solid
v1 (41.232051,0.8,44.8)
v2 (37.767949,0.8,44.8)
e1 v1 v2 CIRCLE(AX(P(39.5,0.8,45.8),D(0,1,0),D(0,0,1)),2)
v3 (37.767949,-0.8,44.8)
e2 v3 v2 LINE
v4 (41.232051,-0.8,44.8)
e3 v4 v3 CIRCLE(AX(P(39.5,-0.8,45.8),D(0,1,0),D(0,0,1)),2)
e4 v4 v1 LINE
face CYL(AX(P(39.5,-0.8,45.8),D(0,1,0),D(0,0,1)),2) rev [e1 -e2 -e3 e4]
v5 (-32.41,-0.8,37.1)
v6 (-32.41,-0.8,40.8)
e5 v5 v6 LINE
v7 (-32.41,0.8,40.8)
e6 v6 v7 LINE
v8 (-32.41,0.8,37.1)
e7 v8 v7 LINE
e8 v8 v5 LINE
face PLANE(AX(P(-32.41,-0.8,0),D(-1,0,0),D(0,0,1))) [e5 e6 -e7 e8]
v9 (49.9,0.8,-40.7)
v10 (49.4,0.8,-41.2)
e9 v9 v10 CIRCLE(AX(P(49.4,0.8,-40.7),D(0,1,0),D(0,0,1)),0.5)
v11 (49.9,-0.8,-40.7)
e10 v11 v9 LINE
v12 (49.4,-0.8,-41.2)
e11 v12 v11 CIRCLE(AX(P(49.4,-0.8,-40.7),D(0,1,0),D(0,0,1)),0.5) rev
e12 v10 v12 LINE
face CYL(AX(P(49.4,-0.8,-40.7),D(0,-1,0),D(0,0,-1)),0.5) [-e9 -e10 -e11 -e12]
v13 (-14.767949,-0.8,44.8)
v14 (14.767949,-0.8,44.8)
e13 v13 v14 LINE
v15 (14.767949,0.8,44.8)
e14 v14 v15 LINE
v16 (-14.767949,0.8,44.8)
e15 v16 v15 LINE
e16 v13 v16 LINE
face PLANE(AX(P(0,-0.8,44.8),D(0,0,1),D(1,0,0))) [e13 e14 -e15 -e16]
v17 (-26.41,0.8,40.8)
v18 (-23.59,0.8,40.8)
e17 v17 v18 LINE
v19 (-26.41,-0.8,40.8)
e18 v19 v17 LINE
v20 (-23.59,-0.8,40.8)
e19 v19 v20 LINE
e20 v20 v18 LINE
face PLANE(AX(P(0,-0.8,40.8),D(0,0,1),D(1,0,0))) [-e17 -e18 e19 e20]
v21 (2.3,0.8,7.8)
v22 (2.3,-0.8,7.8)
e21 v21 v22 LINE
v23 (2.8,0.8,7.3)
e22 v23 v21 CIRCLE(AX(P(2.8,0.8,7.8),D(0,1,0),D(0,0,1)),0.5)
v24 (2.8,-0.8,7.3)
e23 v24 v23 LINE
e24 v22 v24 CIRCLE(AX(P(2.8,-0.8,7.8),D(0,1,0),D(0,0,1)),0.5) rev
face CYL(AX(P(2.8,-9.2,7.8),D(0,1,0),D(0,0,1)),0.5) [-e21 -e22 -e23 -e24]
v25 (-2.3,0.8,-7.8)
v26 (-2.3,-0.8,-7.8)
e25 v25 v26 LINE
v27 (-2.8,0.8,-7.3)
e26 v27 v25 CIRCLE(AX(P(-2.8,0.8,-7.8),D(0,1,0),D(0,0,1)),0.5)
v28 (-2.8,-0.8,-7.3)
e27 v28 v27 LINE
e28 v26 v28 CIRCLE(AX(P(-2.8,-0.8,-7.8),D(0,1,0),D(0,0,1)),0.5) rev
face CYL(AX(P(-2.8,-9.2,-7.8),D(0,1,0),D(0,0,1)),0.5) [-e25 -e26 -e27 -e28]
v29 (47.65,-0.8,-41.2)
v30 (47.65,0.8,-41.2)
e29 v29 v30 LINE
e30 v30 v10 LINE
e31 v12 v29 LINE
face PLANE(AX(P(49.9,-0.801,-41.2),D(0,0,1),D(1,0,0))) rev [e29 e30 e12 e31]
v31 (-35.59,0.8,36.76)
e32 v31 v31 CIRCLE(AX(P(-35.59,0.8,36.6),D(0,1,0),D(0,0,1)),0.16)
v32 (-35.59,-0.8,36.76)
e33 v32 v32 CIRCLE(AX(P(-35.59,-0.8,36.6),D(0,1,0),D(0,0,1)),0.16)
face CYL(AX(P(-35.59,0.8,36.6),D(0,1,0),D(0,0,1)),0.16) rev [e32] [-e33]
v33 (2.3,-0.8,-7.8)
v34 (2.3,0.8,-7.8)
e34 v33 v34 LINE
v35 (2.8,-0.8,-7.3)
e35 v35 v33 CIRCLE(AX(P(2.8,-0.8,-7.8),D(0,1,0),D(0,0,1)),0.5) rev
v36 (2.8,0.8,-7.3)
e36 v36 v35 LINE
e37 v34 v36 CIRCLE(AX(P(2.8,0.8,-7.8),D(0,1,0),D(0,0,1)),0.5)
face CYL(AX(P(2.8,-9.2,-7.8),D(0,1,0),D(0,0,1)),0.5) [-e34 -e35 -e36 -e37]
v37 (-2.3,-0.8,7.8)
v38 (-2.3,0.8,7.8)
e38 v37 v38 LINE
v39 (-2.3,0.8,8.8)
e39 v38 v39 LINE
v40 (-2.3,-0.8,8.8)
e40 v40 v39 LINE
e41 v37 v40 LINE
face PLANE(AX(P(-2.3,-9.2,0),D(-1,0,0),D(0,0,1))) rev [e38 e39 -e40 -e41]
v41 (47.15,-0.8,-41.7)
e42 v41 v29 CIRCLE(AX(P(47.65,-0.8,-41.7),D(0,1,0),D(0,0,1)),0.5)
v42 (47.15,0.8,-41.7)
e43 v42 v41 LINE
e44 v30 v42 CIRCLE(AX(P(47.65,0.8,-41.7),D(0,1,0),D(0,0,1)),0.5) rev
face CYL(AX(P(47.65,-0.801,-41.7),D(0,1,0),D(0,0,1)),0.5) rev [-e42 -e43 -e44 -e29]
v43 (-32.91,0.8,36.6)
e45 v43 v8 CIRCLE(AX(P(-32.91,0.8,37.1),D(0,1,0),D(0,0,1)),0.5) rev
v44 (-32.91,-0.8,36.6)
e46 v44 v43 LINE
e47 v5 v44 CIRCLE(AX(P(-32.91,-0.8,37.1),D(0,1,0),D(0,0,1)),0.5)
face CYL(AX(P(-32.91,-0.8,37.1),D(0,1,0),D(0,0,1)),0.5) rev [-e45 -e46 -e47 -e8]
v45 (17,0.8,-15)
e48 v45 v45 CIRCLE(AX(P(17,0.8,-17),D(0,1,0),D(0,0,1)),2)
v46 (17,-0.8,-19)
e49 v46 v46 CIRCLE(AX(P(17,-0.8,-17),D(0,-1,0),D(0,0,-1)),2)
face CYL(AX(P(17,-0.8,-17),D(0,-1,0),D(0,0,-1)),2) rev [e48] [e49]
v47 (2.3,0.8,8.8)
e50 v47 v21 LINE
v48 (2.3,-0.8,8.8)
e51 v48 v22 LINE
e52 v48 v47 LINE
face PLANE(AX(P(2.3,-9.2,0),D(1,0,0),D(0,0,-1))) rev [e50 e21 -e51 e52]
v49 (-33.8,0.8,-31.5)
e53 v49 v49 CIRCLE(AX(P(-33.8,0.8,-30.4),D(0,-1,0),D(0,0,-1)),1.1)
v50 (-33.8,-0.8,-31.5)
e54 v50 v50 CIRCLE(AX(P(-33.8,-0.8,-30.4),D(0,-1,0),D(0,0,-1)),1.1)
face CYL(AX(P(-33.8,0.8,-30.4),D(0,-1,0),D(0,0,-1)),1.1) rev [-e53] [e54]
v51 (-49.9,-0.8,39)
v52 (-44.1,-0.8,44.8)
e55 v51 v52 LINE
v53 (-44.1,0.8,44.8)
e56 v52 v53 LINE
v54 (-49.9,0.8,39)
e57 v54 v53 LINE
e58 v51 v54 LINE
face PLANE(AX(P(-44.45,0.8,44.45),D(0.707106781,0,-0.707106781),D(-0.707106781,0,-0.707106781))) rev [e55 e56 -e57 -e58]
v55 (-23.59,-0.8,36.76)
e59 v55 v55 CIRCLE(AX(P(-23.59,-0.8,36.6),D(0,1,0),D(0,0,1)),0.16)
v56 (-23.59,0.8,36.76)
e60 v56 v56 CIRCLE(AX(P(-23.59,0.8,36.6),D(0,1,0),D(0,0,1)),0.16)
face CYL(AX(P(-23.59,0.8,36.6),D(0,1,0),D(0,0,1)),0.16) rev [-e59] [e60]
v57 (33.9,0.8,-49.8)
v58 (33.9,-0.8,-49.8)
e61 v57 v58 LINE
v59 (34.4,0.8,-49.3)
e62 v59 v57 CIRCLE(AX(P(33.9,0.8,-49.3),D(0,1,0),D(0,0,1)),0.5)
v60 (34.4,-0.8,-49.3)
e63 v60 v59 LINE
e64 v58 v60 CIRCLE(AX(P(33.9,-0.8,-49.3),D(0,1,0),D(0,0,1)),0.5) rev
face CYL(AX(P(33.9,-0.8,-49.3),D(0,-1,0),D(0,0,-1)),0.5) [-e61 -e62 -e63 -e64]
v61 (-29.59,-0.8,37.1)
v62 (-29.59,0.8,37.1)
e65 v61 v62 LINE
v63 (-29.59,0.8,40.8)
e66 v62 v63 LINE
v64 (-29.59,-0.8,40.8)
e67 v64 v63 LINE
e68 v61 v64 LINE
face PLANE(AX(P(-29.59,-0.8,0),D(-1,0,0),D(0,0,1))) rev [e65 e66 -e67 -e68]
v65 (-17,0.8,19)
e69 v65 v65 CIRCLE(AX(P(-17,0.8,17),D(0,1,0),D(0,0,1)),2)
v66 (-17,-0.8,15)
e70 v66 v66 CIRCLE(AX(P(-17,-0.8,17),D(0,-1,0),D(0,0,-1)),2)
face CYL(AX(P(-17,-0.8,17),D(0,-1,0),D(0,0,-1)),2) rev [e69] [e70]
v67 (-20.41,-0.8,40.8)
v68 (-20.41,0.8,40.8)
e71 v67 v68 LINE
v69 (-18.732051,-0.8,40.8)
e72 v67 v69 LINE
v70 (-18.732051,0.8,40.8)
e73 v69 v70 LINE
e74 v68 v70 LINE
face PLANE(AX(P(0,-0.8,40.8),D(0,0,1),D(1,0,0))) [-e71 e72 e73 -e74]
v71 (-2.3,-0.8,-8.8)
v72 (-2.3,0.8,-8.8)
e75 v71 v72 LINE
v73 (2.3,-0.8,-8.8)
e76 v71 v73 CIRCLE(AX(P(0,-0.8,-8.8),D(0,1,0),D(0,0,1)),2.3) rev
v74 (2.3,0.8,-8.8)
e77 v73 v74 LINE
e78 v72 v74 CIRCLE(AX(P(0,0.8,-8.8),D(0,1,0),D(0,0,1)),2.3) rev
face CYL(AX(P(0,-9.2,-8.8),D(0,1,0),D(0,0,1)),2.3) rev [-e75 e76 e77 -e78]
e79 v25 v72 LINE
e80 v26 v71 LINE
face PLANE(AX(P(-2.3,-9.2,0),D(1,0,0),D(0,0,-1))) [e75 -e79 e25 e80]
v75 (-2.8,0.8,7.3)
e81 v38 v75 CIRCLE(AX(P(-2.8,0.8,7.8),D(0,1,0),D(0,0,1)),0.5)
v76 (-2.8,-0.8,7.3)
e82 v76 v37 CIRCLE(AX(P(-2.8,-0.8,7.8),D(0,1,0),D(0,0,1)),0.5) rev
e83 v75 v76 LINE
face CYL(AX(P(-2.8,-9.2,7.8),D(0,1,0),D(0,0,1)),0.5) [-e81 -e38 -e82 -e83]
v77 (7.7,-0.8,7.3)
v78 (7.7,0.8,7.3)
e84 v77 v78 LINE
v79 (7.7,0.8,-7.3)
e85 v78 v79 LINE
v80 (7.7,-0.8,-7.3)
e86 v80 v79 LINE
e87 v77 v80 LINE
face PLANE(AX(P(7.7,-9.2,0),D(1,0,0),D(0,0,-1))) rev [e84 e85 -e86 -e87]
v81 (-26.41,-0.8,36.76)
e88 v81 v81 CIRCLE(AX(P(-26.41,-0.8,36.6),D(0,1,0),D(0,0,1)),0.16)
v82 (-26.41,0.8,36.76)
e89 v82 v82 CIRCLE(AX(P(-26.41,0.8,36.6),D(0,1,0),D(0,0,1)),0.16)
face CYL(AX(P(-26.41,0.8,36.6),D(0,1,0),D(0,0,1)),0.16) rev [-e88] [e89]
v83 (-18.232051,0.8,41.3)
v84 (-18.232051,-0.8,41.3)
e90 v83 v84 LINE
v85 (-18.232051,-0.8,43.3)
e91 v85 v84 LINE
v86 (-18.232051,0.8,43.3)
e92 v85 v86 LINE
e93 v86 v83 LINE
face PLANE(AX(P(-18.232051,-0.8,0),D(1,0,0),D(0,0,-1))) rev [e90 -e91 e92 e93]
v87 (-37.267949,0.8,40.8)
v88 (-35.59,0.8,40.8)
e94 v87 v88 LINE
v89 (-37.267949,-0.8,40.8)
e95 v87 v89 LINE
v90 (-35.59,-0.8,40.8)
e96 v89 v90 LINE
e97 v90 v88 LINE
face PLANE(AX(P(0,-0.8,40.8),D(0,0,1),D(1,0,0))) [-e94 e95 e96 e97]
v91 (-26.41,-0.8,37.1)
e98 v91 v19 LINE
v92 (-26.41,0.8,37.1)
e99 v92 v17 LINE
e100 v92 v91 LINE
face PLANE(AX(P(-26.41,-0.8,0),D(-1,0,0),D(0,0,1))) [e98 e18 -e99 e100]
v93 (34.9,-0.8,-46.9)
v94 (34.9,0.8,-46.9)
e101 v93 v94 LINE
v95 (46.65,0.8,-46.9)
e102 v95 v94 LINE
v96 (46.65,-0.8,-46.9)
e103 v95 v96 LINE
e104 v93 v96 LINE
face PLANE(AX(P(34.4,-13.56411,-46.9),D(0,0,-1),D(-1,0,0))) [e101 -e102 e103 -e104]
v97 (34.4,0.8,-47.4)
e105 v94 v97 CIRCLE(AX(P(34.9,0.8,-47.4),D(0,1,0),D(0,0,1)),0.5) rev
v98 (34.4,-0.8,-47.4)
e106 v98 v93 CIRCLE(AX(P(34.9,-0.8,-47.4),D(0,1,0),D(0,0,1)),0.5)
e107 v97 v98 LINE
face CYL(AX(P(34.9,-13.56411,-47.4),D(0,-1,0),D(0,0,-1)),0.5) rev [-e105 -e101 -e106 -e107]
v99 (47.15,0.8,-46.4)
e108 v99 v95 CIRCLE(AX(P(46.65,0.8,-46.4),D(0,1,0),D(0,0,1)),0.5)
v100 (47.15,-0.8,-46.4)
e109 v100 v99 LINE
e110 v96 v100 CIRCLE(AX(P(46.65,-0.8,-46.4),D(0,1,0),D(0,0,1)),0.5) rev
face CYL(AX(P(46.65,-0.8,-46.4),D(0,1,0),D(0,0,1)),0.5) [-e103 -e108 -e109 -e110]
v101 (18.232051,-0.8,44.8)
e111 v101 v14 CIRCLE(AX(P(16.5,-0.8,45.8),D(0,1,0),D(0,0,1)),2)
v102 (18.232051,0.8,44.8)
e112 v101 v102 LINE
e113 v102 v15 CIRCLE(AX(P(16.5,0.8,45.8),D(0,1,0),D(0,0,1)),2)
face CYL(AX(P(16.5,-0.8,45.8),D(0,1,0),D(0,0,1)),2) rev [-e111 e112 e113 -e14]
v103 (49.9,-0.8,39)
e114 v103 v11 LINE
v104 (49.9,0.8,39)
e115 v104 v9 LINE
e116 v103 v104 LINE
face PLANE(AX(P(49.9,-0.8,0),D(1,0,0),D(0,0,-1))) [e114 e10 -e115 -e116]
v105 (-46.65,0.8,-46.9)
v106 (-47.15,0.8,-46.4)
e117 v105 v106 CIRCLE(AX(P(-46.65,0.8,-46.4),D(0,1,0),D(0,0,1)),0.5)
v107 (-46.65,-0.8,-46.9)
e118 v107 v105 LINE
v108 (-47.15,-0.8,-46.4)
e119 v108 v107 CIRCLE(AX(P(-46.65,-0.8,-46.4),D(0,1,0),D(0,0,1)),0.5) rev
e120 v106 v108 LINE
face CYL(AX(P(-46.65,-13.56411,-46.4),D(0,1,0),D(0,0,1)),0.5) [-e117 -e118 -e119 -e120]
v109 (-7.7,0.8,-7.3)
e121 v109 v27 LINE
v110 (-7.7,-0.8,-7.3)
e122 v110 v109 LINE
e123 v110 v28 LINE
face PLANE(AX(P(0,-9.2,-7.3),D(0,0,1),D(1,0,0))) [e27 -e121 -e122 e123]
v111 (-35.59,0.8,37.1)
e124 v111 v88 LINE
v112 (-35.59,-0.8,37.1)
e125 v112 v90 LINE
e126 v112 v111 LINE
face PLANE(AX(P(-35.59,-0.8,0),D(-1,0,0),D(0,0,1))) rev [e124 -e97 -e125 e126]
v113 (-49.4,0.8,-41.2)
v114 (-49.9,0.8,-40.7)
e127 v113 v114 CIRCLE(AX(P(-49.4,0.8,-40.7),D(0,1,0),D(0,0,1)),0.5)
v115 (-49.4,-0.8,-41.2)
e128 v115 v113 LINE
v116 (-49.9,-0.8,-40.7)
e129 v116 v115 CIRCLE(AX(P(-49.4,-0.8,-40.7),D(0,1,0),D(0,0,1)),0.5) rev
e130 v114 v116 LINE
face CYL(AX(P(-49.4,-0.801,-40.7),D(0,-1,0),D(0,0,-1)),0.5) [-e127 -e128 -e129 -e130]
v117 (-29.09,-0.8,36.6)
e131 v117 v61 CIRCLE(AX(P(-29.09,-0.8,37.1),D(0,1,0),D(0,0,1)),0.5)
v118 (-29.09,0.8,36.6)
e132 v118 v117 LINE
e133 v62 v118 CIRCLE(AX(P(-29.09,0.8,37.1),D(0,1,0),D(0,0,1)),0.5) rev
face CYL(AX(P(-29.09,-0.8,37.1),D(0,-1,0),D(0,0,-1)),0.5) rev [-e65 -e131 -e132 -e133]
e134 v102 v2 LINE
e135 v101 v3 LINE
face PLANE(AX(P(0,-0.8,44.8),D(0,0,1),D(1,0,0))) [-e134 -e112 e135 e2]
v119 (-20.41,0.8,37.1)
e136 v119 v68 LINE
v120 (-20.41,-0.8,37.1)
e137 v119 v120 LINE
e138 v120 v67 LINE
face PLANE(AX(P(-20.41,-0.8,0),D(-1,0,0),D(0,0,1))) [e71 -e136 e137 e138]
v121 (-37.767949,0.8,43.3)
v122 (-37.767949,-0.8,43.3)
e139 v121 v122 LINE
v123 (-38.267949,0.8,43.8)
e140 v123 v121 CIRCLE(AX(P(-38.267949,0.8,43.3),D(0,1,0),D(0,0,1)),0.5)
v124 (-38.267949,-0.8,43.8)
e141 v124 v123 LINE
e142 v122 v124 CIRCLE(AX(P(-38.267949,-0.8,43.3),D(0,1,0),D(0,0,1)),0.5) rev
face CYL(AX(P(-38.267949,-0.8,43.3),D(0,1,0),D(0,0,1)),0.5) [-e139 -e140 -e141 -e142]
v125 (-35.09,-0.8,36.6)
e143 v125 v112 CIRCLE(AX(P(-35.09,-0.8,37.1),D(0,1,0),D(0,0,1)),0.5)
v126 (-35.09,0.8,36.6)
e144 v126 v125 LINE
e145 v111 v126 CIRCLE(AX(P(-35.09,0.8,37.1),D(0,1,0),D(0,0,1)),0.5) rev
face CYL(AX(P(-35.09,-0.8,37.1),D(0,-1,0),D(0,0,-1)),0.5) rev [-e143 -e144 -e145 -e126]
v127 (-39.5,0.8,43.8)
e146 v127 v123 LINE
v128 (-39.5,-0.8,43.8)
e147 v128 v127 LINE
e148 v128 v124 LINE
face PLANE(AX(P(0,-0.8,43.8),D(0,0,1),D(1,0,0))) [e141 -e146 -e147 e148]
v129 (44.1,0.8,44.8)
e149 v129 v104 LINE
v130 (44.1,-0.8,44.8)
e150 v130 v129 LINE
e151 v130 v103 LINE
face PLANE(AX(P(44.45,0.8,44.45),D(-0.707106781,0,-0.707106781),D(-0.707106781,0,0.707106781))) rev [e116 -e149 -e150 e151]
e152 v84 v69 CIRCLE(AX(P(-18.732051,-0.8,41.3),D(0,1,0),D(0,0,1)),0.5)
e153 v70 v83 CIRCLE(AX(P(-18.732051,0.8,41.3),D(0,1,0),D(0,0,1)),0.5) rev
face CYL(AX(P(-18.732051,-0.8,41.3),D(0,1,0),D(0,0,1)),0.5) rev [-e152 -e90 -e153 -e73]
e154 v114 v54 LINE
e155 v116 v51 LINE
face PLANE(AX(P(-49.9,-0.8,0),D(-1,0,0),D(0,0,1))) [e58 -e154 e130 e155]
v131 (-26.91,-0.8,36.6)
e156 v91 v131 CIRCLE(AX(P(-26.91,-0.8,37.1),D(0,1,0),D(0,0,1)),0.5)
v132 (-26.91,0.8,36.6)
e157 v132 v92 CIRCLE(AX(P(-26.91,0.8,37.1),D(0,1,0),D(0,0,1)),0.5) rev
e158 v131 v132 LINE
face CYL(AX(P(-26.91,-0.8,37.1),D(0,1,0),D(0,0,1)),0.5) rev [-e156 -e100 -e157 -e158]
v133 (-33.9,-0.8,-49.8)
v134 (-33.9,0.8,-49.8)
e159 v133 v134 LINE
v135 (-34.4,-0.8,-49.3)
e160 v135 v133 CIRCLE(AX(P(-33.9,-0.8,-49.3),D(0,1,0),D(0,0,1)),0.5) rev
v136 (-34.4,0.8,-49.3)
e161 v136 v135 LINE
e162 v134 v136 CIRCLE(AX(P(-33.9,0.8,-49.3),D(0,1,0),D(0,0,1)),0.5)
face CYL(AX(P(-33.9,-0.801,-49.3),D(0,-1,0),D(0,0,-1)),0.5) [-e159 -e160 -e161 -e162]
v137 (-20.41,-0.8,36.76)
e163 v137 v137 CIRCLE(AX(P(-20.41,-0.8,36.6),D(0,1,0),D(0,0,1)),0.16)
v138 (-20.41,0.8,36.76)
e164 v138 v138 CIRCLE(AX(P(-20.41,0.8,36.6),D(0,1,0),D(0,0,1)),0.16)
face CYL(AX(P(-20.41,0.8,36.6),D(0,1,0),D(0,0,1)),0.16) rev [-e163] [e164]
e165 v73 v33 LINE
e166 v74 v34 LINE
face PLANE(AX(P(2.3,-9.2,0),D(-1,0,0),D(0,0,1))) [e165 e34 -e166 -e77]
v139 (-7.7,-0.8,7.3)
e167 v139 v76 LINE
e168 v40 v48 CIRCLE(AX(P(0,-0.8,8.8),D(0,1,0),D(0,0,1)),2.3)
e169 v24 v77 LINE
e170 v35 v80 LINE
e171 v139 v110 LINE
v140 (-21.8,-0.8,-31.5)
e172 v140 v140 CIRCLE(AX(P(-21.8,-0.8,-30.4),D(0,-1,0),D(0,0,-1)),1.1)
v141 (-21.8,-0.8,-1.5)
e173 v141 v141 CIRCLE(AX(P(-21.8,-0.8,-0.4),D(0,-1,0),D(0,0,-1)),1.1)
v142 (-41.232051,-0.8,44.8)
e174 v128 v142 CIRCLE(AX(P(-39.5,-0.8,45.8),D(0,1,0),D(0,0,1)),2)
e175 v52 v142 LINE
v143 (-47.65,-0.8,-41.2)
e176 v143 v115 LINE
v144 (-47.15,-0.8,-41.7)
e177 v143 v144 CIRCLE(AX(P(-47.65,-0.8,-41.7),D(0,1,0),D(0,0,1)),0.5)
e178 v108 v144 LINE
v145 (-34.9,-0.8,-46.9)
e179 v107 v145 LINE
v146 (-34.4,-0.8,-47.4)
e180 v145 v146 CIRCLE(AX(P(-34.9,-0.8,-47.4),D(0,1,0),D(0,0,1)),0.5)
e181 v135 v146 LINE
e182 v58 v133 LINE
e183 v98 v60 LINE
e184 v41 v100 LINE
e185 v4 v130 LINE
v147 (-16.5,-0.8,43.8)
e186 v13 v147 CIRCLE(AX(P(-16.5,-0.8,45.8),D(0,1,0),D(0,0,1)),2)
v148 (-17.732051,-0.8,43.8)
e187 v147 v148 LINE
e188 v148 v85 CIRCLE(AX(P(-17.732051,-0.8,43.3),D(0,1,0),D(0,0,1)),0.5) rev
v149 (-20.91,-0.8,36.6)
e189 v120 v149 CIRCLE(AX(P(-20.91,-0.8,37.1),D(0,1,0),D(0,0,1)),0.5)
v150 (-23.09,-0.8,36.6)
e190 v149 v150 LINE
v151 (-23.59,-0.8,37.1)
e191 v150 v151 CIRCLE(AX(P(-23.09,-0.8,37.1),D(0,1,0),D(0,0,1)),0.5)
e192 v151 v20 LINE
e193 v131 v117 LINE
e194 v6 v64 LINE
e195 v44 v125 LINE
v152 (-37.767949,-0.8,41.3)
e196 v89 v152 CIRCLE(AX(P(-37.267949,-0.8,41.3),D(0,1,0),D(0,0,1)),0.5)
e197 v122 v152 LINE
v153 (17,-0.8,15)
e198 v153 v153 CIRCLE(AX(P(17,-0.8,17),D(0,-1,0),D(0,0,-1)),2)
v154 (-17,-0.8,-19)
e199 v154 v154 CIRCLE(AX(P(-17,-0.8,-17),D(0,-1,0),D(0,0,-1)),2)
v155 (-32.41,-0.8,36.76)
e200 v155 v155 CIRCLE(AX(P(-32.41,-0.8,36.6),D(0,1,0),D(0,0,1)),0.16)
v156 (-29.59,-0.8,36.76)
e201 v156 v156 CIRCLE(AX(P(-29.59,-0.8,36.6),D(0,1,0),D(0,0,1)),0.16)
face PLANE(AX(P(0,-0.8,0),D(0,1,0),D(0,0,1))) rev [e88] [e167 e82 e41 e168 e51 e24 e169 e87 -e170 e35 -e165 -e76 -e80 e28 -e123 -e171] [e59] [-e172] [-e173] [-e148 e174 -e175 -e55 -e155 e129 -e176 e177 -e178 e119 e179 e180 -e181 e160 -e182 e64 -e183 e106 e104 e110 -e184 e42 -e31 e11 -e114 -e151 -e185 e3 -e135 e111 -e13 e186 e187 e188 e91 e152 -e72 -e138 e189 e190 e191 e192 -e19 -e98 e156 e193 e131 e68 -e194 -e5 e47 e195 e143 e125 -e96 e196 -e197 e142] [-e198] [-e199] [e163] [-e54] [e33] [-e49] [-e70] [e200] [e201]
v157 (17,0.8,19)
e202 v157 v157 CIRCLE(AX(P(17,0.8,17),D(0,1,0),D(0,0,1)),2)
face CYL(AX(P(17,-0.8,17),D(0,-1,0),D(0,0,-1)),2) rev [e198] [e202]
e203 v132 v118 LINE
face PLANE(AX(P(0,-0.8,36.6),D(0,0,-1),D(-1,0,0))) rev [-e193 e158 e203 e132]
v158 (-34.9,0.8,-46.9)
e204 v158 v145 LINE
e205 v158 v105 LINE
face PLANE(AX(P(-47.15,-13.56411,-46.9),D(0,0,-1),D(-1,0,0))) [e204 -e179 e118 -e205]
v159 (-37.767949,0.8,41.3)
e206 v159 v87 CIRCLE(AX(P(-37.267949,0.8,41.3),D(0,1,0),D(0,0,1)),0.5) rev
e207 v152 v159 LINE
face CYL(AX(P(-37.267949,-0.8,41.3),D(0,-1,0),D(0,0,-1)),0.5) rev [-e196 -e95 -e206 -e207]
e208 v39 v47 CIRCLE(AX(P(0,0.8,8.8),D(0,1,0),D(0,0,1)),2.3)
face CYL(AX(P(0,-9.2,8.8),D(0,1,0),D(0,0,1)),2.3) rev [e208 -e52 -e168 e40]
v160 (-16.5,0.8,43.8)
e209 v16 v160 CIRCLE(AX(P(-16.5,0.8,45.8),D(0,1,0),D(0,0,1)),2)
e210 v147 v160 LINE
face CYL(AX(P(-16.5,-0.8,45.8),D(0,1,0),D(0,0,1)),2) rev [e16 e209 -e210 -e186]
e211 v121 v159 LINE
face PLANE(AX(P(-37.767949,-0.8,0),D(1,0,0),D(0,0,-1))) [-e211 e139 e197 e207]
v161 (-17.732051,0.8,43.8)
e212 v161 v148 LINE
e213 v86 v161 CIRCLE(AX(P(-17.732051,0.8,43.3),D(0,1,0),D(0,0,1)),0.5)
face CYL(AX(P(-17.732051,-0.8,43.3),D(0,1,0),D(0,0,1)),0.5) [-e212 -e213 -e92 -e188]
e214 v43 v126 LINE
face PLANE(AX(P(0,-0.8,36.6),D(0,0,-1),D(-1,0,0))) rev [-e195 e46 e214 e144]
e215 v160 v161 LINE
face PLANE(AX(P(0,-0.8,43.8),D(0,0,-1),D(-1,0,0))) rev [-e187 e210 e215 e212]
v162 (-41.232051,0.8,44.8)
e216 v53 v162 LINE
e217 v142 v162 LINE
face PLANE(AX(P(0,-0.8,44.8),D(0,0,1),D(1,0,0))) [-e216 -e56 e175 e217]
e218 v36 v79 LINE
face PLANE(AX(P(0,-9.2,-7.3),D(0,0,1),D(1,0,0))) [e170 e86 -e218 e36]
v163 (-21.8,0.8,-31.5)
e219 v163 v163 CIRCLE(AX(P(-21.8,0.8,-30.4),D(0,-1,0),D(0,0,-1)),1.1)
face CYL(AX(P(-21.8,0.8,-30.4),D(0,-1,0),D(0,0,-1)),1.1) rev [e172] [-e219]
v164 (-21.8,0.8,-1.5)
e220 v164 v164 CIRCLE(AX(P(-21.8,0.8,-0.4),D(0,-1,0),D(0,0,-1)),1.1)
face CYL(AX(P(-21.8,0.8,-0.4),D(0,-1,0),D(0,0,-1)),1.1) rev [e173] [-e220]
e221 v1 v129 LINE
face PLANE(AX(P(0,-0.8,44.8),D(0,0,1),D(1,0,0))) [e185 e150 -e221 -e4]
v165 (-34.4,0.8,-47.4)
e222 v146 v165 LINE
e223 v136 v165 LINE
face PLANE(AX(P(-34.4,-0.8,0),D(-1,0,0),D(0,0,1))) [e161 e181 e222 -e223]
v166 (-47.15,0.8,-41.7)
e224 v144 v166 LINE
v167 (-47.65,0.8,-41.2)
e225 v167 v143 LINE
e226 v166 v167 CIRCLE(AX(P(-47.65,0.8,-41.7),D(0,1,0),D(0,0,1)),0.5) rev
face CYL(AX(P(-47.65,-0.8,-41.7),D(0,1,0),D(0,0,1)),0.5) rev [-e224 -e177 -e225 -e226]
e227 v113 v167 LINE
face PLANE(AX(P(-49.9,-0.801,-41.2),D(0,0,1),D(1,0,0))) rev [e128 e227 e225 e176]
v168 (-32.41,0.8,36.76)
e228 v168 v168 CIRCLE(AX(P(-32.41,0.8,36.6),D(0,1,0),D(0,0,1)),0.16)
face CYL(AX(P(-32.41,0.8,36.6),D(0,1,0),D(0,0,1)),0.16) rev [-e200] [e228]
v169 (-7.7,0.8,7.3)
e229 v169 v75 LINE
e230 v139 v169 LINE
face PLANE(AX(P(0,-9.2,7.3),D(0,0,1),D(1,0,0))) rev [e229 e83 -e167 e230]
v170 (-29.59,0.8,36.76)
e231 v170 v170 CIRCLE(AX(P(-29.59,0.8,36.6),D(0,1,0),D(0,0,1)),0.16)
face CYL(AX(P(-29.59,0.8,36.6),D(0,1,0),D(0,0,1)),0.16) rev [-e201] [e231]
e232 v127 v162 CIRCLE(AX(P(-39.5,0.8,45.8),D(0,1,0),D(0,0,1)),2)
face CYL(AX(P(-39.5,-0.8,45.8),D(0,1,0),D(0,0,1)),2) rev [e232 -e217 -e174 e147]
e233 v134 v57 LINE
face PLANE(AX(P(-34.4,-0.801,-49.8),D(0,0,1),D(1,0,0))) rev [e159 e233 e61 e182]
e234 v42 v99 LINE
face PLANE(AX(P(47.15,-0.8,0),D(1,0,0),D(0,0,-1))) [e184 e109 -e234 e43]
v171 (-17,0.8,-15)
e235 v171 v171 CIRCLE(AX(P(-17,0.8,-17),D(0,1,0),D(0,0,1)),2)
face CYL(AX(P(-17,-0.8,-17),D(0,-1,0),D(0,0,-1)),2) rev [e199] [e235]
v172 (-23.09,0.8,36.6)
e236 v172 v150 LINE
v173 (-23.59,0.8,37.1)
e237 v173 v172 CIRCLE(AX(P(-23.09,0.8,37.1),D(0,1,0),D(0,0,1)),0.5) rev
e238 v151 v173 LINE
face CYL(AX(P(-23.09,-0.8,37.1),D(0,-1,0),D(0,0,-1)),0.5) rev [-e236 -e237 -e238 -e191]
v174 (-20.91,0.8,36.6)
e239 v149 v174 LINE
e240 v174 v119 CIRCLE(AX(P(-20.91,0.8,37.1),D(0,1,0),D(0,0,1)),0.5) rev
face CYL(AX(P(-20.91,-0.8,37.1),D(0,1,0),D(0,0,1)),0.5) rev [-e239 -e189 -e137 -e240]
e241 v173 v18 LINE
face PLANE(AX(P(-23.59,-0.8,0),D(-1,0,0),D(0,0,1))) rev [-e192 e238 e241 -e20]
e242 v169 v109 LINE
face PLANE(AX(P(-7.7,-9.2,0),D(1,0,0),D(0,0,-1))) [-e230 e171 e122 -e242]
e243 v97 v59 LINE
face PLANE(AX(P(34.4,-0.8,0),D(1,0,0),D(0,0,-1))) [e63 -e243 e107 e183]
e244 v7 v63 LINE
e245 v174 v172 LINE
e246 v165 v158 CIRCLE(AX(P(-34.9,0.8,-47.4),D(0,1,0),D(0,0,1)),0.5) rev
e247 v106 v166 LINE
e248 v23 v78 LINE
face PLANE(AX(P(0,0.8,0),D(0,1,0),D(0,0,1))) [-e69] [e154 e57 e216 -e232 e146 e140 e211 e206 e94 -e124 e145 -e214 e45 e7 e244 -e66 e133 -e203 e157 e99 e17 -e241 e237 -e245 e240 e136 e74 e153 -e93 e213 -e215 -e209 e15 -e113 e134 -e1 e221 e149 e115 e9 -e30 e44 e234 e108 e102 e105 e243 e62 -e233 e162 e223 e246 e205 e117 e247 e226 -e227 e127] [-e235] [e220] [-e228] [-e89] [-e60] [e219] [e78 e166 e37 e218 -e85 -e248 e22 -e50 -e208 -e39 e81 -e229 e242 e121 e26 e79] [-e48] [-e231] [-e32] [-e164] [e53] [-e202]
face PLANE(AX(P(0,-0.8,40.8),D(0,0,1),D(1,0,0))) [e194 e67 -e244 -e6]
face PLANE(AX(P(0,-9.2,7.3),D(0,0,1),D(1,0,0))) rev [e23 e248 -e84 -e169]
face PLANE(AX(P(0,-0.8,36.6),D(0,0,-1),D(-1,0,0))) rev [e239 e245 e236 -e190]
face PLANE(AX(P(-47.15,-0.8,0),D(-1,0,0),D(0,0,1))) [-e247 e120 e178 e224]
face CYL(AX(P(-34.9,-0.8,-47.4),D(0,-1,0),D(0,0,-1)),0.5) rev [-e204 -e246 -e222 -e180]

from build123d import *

# Parameters (mm, degrees)
GENERICCARDPCBDEFINITION_FILLET3_START   = -0.8
GENERICCARDPCBDEFINITION_FILLET3_OUTLI_R = 0.16
GENERICCARDPCBDEFINITION_FILLET3_DEPTH   = 1.6
SKETCH1_R                                = 1
SKETCH1_W                                = 15.4
SKETCH1_H                                = 14.6
SKETCH1_W_2                              = 13.4
SKETCH1_H_2                              = 12.6
CUT_EXTRUDE1_DEPTH                       = 10
F_4_0MM_DOWEL_HOLE1_D                    = 4
F_4_0MM_DOWEL_HOLE1_DEPTH                = 29.81
F_4_0MM_DOWEL_HOLE1_TIP                  = 1.201721238
SKETCH5_R                                = 1.1
CUT_EXTRUDE2_DEPTH                       = 71.516735602
FILLET1_R                                = 0.5


# Read off the part's stored shape, not the designer's step: <GenericCardPCBDefinition>-<Fillet3>
with BuildPart() as part:
    # <GenericCardPCBDefinition>-<Fillet3> outli → <GenericCardPCBDefinition>-<Fillet3> (new body)
    with BuildSketch(Plane(origin=(0, 0, 0), x_dir=(1, 0, 0), z_dir=(0, 1, 0)).offset(GENERICCARDPCBDEFINITION_FILLET3_START)):
        with BuildLine():
            ThreePointArc((-41.232050808, -44.8), (-40.5, -44.067949192), (-39.5, -43.8))
            Line((-39.5, -43.8), (-38.267949192, -43.8))
            ThreePointArc((-38.267949192, -43.8), (-37.914395801, -43.653553391), (-37.767949192, -43.3))
            Line((-37.767949192, -43.3), (-37.767949192, -41.3))
            ThreePointArc((-37.767949192, -41.3), (-37.621502583, -40.946446609), (-37.267949192, -40.8))
            Line((-37.267949192, -40.8), (-35.59, -40.8))
            Line((-35.59, -40.8), (-35.59, -37.1))
            ThreePointArc((-35.59, -37.1), (-35.443553391, -36.746446609), (-35.09, -36.6))
            Line((-35.09, -36.6), (-32.91, -36.6))
            ThreePointArc((-32.91, -36.6), (-32.556446609, -36.746446609), (-32.41, -37.1))
            Line((-32.41, -37.1), (-32.41, -40.8))
            Line((-32.41, -40.8), (-29.59, -40.8))
            Line((-29.59, -40.8), (-29.59, -37.1))
            ThreePointArc((-29.59, -37.1), (-29.443553391, -36.746446609), (-29.09, -36.6))
            Line((-29.09, -36.6), (-26.91, -36.6))
            ThreePointArc((-26.91, -36.6), (-26.556446609, -36.746446609), (-26.41, -37.1))
            Line((-26.41, -37.1), (-26.41, -40.8))
            Line((-26.41, -40.8), (-23.59, -40.8))
            Line((-23.59, -40.8), (-23.59, -37.1))
            ThreePointArc((-23.59, -37.1), (-23.443553391, -36.746446609), (-23.09, -36.6))
            Line((-23.09, -36.6), (-20.91, -36.6))
            ThreePointArc((-20.91, -36.6), (-20.556446609, -36.746446609), (-20.41, -37.1))
            Line((-20.41, -37.1), (-20.41, -40.8))
            Line((-20.41, -40.8), (-18.732050808, -40.8))
            ThreePointArc((-18.732050808, -40.8), (-18.378497417, -40.946446609), (-18.232050808, -41.3))
            Line((-18.232050808, -41.3), (-18.232050808, -43.3))
            ThreePointArc((-18.232050808, -43.3), (-18.085604199, -43.653553391), (-17.732050808, -43.8))
            Line((-17.732050808, -43.8), (-16.5, -43.8))
            ThreePointArc((-16.5, -43.8), (-15.5, -44.067949192), (-14.767949192, -44.8))
            Line((-14.767949192, -44.8), (14.767949192, -44.8))
            ThreePointArc((14.767949192, -44.8), (16.5, -43.8), (18.232050808, -44.8))
            Line((18.232050808, -44.8), (37.767949192, -44.8))
            ThreePointArc((37.767949192, -44.8), (39.5, -43.8), (41.232050808, -44.8))
            Line((41.232050808, -44.8), (44.1, -44.8))
            Line((44.1, -44.8), (49.9, -39))
            Line((49.9, -39), (49.9, 40.7))
            ThreePointArc((49.9, 40.7), (49.753553391, 41.053553391), (49.4, 41.2))
            Line((49.4, 41.2), (47.65, 41.2))
            ThreePointArc((47.65, 41.2), (47.296446609, 41.346446609), (47.15, 41.7))
            Line((47.15, 41.7), (47.15, 46.4))
            ThreePointArc((47.15, 46.4), (47.003553391, 46.753553391), (46.65, 46.9))
            Line((46.65, 46.9), (34.9, 46.9))
            ThreePointArc((34.9, 46.9), (34.546446609, 47.046446609), (34.4, 47.4))
            Line((34.4, 47.4), (34.4, 49.3))
            ThreePointArc((34.4, 49.3), (34.253553391, 49.653553391), (33.9, 49.8))
            Line((33.9, 49.8), (-33.9, 49.8))
            ThreePointArc((-33.9, 49.8), (-34.253553391, 49.653553391), (-34.4, 49.3))
            Line((-34.4, 49.3), (-34.4, 47.4))
            ThreePointArc((-34.4, 47.4), (-34.546446609, 47.046446609), (-34.9, 46.9))
            Line((-34.9, 46.9), (-46.65, 46.9))
            ThreePointArc((-46.65, 46.9), (-47.003553391, 46.753553391), (-47.15, 46.4))
            Line((-47.15, 46.4), (-47.15, 41.7))
            ThreePointArc((-47.15, 41.7), (-47.296446609, 41.346446609), (-47.65, 41.2))
            Line((-47.65, 41.2), (-49.4, 41.2))
            ThreePointArc((-49.4, 41.2), (-49.753553391, 41.053553391), (-49.9, 40.7))
            Line((-49.9, 40.7), (-49.9, -39))
            Line((-49.9, -39), (-44.1, -44.8))
            Line((-44.1, -44.8), (-41.232050808, -44.8))
        make_face()
        with Locations((-35.59, -36.6)):
            Circle(GENERICCARDPCBDEFINITION_FILLET3_OUTLI_R, mode=Mode.SUBTRACT)
        with Locations((-32.41, -36.6)):
            Circle(GENERICCARDPCBDEFINITION_FILLET3_OUTLI_R, mode=Mode.SUBTRACT)
        with Locations((-29.59, -36.6)):
            Circle(GENERICCARDPCBDEFINITION_FILLET3_OUTLI_R, mode=Mode.SUBTRACT)
        with Locations((-26.41, -36.6)):
            Circle(GENERICCARDPCBDEFINITION_FILLET3_OUTLI_R, mode=Mode.SUBTRACT)
        with Locations((-23.59, -36.6)):
            Circle(GENERICCARDPCBDEFINITION_FILLET3_OUTLI_R, mode=Mode.SUBTRACT)
        with Locations((-20.41, -36.6)):
            Circle(GENERICCARDPCBDEFINITION_FILLET3_OUTLI_R, mode=Mode.SUBTRACT)
    extrude(amount=GENERICCARDPCBDEFINITION_FILLET3_DEPTH)

    # Sketch1 → Cut-Extrude1 (cut)
    # profile 1 of 6: a face of its own
    with BuildSketch(Plane(origin=(0, 0.8, 0), x_dir=(1, 0, 0), z_dir=(0, 1, 0))):
        with BuildLine():
            Line((2.3, -7.3), (-2.3, -7.3))
            Line((-2.3, -7.3), (-2.3, -8.8))
            ThreePointArc((-2.3, -8.8), (0, -11.1), (2.3, -8.8))
            Line((2.3, -8.8), (2.3, -7.3))
        make_face()
        with Locations((0, -9)):
            Circle(SKETCH1_R, mode=Mode.SUBTRACT)
    # profile 2 of 6: a face of its own
    with BuildSketch(Plane(origin=(0, 0.8, 0), x_dir=(1, 0, 0), z_dir=(0, 1, 0))):
        Rectangle(SKETCH1_W, SKETCH1_H)
        Rectangle(SKETCH1_W_2, SKETCH1_H_2, mode=Mode.SUBTRACT)
    # profile 3 of 6: a face of its own
    with BuildSketch(Plane(origin=(0, 0.8, 0), x_dir=(1, 0, 0), z_dir=(0, 1, 0))):
        Rectangle(SKETCH1_W_2, SKETCH1_H_2)
    # profile 4 of 6: a face of its own
    with BuildSketch(Plane(origin=(0, 0.8, 0), x_dir=(1, 0, 0), z_dir=(0, 1, 0))):
        with BuildLine():
            Line((-2.3, 8.8), (-2.3, 7.3))
            Line((-2.3, 7.3), (2.3, 7.3))
            Line((2.3, 7.3), (2.3, 8.8))
            ThreePointArc((2.3, 8.8), (0, 11.1), (-2.3, 8.8))
        make_face()
        with Locations((0, 9)):
            Circle(SKETCH1_R, mode=Mode.SUBTRACT)
    # profile 5 of 6: a face of its own
    with BuildSketch(Plane(origin=(0, 0.8, 0), x_dir=(1, 0, 0), z_dir=(0, 1, 0))):
        with Locations((0, 9)):
            Circle(SKETCH1_R)
    # profile 6 of 6: a face of its own
    with BuildSketch(Plane(origin=(0, 0.8, 0), x_dir=(1, 0, 0), z_dir=(0, 1, 0))):
        with Locations((0, -9)):
            Circle(SKETCH1_R)
    extrude(amount=-CUT_EXTRUDE1_DEPTH, mode=Mode.SUBTRACT)

    # Ø4.0mm Dowel Hole1
    with Locations(Plane(origin=(0, -0.8, 0), x_dir=(-1, 0, 0), z_dir=(0, -1, 0))):
        with Locations((17, -17), (-17, -17), (17, 17), (-17, 17)):
            Hole(F_4_0MM_DOWEL_HOLE1_D / 2, depth=F_4_0MM_DOWEL_HOLE1_DEPTH)
            with Locations((0, 0, -(F_4_0MM_DOWEL_HOLE1_DEPTH + F_4_0MM_DOWEL_HOLE1_TIP / 2))):  # 118° drill point
                Cone(0, F_4_0MM_DOWEL_HOLE1_D / 2, F_4_0MM_DOWEL_HOLE1_TIP, mode=Mode.SUBTRACT)

    # Sketch5 → Cut-Extrude2 (cut, through all)
    with BuildSketch(Plane.XZ.offset(0.8)):
        with Locations(Location((-33.8, -30.4, 0), (0, 0, 270))):
            Circle(SKETCH5_R)
        with Locations(Location((-21.8, -30.4, 0), (0, 0, 270))):
            Circle(SKETCH5_R)
        with Locations(Location((-21.8, -0.4, 0), (0, 0, 270))):
            Circle(SKETCH5_R)
    extrude(amount=-CUT_EXTRUDE2_DEPTH, mode=Mode.SUBTRACT)

    # Fillet1
    fillet1_edges = [part.edges().sort_by_distance(p)[0] for p in [
        (-2.3, 0, 7.3),
        (-2.3, 0, -7.3),
        (2.3, 0, -7.3),
        (2.3, 0, 7.3),
    ]]
    fillet(fillet1_edges, radius=FILLET1_R)


solid = part.part
